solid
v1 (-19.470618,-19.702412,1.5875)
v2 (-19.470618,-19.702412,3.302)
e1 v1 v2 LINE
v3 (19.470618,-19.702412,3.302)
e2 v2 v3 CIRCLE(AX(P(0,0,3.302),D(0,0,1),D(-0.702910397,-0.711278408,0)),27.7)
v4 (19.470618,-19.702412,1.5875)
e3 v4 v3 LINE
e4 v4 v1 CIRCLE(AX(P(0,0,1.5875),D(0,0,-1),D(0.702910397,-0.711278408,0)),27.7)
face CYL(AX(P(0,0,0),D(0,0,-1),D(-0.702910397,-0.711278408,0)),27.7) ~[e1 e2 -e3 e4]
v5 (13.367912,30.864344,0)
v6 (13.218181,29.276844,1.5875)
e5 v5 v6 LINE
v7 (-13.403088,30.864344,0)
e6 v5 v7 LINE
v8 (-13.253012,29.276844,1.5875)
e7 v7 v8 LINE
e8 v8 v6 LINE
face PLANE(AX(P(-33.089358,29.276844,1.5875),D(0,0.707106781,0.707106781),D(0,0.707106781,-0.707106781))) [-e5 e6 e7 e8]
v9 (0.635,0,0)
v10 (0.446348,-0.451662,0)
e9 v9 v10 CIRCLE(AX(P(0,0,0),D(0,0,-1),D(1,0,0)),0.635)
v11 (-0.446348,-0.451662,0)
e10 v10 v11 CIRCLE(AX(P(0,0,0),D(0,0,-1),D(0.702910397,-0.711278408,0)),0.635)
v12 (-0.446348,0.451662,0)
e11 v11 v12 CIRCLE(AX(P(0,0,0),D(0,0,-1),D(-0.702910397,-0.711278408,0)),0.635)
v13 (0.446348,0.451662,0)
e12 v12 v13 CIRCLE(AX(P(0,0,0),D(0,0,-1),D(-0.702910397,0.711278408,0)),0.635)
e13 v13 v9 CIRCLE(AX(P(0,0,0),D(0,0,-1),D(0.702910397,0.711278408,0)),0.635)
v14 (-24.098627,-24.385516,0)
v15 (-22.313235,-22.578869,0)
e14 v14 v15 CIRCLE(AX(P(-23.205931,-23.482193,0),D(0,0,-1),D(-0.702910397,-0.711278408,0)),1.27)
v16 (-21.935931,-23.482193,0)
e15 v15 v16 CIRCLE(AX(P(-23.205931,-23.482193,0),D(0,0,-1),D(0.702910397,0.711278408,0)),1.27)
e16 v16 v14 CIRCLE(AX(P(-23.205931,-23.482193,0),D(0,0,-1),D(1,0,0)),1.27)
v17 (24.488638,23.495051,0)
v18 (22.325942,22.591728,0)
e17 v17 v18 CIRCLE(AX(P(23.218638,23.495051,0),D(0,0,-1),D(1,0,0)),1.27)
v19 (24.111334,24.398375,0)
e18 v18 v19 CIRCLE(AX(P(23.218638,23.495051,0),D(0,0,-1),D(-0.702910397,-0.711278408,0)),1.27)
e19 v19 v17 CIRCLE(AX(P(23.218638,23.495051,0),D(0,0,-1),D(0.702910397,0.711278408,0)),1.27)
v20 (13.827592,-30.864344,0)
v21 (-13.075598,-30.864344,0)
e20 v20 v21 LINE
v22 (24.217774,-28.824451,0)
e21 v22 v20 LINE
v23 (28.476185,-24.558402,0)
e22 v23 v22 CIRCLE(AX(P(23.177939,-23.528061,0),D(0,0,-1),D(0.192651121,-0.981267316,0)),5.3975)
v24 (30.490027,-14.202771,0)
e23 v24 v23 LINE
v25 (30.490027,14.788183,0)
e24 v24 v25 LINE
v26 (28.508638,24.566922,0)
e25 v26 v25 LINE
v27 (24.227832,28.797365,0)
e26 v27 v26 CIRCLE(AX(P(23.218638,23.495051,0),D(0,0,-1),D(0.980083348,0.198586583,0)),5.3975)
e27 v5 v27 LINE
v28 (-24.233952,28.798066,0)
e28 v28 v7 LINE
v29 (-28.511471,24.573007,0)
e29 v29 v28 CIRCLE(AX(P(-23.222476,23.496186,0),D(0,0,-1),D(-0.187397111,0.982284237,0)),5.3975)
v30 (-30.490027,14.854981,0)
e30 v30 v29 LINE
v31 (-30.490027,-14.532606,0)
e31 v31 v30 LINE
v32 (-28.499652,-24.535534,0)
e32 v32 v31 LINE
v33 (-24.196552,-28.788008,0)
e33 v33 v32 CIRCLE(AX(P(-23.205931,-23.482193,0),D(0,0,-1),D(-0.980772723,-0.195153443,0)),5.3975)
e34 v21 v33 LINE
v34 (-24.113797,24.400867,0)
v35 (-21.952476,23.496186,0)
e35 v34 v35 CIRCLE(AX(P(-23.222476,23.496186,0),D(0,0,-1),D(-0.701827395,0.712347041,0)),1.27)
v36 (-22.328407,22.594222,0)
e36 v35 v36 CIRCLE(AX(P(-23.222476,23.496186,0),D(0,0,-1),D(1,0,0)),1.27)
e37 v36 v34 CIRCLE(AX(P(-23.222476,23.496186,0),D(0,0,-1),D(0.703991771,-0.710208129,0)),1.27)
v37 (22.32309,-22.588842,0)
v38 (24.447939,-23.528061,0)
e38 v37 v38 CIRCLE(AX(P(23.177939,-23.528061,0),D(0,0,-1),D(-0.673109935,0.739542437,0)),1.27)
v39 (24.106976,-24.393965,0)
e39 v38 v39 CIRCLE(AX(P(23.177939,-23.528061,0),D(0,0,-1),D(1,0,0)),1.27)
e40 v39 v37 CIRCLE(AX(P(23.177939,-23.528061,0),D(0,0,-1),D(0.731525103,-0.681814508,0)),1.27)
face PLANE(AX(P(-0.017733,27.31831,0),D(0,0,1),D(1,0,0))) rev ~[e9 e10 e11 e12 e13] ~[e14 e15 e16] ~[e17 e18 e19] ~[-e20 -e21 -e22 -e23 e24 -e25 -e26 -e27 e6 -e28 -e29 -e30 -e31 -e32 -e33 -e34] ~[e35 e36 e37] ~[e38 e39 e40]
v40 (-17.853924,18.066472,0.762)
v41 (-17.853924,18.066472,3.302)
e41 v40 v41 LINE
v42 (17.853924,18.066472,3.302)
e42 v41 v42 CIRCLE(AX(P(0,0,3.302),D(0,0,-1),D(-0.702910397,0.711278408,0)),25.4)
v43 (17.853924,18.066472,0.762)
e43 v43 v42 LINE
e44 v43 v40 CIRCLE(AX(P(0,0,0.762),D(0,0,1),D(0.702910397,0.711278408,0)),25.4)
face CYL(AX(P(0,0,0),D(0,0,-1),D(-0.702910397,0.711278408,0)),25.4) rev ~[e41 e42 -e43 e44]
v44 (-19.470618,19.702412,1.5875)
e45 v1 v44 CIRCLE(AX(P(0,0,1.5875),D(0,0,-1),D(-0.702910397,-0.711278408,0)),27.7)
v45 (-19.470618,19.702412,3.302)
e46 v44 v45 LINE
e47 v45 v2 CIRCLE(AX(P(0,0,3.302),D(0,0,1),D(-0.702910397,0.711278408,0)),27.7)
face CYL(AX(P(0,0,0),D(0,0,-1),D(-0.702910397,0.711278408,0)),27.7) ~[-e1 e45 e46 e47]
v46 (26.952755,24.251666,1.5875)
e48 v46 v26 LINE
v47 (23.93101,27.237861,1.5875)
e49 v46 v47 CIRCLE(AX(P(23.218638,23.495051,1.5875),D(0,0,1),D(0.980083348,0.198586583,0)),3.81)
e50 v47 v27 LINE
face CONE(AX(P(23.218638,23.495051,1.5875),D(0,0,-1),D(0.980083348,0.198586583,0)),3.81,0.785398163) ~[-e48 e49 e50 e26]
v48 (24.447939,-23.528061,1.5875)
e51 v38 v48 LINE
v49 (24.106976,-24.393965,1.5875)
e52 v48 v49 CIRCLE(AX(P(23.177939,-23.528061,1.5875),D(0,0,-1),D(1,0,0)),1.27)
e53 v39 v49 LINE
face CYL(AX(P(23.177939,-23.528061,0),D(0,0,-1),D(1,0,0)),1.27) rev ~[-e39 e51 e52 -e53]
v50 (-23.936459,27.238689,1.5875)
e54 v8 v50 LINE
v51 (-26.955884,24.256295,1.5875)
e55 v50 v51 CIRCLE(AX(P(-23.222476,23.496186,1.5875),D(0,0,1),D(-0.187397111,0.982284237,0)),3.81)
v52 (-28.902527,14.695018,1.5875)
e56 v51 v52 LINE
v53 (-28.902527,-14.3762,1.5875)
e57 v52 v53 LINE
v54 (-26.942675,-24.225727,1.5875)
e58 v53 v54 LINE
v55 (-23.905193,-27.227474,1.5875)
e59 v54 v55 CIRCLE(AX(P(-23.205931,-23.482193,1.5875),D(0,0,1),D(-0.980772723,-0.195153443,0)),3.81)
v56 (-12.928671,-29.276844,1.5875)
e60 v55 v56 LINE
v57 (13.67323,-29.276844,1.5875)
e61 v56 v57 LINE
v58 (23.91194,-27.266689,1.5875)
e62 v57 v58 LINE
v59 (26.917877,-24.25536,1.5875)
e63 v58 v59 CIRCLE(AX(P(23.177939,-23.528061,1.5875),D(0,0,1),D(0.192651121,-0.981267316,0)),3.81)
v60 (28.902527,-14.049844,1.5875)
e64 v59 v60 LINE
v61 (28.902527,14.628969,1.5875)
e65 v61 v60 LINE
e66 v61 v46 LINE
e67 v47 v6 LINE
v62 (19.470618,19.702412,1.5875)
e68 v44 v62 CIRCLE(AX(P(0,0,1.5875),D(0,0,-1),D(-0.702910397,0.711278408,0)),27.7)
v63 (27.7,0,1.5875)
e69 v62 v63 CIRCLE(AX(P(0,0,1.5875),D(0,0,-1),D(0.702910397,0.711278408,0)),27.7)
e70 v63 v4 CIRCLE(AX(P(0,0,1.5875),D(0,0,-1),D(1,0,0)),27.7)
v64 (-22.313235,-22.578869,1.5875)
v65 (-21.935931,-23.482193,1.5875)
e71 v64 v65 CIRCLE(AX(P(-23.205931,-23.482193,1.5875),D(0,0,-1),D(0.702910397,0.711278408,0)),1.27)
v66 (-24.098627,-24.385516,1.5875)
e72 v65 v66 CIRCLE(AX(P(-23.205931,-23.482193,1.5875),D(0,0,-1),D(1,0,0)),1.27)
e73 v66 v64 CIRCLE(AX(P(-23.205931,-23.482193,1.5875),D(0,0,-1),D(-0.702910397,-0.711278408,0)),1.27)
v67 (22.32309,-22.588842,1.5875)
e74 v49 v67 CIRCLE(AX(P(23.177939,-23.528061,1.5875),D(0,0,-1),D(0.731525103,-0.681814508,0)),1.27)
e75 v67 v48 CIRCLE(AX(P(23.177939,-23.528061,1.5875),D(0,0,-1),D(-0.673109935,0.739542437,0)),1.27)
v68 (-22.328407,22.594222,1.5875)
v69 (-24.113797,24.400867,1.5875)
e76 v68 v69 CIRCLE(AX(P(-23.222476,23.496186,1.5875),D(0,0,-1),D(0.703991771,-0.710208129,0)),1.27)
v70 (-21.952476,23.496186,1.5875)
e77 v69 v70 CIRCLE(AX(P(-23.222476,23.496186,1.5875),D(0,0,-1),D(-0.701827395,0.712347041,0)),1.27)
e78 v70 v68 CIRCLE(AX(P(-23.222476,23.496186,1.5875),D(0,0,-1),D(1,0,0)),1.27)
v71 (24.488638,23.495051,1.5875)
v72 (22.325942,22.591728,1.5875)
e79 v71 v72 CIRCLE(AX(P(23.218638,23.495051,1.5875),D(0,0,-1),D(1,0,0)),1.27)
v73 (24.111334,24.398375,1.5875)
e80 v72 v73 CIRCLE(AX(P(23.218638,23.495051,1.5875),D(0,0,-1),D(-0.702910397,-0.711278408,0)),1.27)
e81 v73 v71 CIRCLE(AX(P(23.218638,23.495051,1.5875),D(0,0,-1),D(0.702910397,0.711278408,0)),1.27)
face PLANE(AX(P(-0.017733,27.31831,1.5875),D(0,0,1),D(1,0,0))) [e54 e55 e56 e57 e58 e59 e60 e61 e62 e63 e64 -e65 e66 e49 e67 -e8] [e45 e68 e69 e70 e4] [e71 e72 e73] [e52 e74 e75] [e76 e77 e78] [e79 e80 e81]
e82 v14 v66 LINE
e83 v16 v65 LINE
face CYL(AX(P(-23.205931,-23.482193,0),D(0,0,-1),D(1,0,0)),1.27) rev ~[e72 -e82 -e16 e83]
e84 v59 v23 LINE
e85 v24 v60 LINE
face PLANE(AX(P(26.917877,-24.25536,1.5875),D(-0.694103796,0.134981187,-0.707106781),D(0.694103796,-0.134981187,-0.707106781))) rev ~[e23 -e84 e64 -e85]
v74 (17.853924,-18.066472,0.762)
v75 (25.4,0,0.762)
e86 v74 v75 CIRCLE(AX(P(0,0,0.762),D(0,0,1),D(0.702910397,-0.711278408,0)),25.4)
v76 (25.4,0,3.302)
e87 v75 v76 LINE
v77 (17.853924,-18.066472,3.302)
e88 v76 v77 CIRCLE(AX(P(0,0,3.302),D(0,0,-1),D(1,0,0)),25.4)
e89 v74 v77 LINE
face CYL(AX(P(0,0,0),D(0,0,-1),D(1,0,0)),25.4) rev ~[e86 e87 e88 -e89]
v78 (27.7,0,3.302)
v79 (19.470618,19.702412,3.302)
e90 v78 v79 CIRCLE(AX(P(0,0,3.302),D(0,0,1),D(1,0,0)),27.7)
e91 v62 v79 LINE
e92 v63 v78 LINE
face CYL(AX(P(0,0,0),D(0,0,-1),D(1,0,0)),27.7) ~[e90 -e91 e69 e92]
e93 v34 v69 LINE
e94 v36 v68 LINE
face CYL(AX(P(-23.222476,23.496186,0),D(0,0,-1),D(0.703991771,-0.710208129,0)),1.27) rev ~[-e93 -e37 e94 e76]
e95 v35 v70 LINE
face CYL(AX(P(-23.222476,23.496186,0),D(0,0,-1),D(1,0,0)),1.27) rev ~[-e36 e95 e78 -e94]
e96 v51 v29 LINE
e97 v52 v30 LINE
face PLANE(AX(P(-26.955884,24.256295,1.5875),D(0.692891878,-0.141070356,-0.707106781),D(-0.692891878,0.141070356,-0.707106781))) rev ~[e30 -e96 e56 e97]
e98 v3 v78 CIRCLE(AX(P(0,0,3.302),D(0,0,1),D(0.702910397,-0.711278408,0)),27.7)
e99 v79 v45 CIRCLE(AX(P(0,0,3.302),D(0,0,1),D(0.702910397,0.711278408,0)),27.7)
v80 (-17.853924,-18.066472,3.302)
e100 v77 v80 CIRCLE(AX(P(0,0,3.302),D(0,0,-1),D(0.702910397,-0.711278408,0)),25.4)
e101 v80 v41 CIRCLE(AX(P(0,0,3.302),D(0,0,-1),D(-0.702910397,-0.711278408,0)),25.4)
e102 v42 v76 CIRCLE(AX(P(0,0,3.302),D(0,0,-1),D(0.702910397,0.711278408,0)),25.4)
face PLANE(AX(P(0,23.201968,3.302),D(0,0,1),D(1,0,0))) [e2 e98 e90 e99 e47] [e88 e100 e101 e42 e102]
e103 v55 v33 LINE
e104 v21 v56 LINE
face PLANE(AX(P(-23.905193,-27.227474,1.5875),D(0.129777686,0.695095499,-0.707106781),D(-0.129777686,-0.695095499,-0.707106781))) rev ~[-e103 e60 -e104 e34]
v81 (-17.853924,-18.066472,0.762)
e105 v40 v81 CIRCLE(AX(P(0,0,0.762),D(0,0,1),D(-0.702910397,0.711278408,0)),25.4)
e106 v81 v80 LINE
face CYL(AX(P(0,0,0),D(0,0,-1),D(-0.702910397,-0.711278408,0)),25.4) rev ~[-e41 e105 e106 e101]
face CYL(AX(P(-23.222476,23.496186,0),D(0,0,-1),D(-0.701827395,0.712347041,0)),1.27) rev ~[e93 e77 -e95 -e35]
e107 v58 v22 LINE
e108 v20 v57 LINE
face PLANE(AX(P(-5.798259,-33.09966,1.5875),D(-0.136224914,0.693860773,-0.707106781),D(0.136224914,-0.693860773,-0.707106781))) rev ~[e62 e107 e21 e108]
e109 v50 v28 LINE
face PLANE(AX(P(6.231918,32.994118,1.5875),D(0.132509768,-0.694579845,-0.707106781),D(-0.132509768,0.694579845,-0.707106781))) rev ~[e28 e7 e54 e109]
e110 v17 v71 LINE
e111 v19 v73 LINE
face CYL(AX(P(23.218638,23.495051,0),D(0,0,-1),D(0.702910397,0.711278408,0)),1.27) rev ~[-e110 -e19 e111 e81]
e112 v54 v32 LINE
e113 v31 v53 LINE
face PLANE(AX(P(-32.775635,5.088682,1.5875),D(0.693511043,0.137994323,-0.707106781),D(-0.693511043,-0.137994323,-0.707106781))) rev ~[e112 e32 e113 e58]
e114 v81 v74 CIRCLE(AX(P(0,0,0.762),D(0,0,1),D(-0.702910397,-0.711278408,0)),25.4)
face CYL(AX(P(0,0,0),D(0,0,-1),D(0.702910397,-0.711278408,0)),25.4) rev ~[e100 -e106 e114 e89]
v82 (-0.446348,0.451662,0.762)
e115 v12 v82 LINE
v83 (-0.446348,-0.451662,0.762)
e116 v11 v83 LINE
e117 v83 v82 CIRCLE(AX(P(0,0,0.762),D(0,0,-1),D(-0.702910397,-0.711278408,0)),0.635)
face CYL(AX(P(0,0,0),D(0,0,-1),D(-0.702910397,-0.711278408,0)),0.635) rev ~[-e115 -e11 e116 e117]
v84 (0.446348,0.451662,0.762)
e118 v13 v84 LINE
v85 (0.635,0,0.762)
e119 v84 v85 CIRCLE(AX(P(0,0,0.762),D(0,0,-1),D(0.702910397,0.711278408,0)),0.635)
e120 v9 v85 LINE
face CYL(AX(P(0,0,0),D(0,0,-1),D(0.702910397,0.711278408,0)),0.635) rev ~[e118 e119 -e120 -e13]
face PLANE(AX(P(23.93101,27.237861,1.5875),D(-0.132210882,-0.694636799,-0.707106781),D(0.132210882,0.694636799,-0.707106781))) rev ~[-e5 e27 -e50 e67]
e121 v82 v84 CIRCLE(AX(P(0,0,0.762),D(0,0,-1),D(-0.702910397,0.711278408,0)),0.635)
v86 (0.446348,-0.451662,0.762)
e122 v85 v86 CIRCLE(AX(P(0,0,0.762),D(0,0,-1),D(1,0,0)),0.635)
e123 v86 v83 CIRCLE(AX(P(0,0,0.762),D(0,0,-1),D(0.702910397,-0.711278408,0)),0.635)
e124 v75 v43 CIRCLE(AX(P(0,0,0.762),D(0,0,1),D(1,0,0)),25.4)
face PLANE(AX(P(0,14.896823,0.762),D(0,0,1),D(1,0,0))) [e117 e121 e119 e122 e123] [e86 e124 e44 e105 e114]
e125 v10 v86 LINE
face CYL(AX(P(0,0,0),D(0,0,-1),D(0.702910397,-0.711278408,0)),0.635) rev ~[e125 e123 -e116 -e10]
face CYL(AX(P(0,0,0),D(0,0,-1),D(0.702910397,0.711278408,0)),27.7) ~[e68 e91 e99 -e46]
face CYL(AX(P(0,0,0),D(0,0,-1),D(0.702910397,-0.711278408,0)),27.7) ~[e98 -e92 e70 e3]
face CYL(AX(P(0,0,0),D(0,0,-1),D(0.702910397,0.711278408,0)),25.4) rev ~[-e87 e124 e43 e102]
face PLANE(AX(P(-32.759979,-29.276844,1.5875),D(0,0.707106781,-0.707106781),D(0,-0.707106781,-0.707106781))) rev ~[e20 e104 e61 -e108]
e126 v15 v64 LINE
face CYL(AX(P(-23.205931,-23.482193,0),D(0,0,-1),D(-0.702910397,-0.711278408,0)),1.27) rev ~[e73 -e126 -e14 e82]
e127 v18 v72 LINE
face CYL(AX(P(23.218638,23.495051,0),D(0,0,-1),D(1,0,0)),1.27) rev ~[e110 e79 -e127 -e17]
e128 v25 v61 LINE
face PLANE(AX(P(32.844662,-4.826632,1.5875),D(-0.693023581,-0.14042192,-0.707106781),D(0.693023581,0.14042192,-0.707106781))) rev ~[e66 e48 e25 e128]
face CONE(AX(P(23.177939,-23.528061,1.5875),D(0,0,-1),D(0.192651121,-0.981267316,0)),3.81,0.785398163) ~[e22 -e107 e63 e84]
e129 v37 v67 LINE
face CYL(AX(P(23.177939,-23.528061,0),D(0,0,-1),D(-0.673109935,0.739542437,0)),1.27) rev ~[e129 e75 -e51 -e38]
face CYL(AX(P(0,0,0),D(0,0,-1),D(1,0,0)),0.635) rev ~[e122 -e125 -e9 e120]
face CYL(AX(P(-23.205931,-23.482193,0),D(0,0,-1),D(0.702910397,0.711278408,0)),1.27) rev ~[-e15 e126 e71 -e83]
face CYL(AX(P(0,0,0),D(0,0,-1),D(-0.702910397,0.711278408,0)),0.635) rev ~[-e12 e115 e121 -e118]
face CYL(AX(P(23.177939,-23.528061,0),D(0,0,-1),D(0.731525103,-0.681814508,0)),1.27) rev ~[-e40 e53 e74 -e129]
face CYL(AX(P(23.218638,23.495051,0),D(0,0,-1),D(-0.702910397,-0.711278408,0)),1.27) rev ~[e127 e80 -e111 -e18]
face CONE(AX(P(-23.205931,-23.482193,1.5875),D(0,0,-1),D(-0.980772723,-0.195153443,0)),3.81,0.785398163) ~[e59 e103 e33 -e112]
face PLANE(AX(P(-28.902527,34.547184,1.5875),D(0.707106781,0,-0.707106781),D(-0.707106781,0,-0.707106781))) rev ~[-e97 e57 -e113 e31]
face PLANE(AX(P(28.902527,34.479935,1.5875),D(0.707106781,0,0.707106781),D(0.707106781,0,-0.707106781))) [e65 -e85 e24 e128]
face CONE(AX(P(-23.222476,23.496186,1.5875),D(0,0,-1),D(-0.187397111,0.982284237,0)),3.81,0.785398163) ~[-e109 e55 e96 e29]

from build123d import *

# Parameters (mm, degrees)
F1_DEPTH     = 0.762
F2_DEPTH     = 3.302
F3_DEPTH     = 1.5875
F4_T1_DEPTH  = 68.7698589568
F4_T3_DEPTH  = 29.8890950425
F4_T5_DEPTH  = 30.9975051116
F4_T7_DEPTH  = 66.2764134385
F4_T9_DEPTH  = 29.6095967996
F4_T11_DEPTH = 30.7124717043
F4_T13_DEPTH = 66.1433332478
F4_T15_DEPTH = 30.7409380137
F4_T17_DEPTH = 29.6692094887
F4_T19_DEPTH = 68.3706865963
F4_T21_DEPTH = 30.237608237
F4_T23_DEPTH = 30.2773753002
F4_T26_ANGLE = 67.887600788
F4_T28_ANGLE = 67.7694142572
F4_T30_ANGLE = 67.6911456036
F4_T32_ANGLE = 68.1706761996


# Not quite as in the source:
# - a fillet or chamfer that OpenCascade refuses, or shapes differently, is made with other operations: its cross-section is extruded or revolved along the edge and cut away or added


with BuildPart() as f1:
    # F0 (on Top) → F1 (new body)
    with BuildSketch(Plane.XY):
        with BuildLine():
            Line((0.4463481019, 0.4516617893), (17.8539240764, 18.0664715723))
            ThreePointArc((17.8539240764, 18.0664715723), (0, 25.4), (-17.8539240764, 18.0664715723))
            Line((-17.8539240764, 18.0664715723), (-0.4463481019, 0.4516617893))
            ThreePointArc((-0.4463481019, 0.4516617893), (0, 0.635), (0.4463481019, 0.4516617893))
        make_face()
        with BuildLine():
            Line((-0.4463481019, 0.4516617893), (-17.8539240764, 18.0664715723))
            ThreePointArc((-17.8539240764, 18.0664715723), (-25.4, 0), (-17.8539240764, -18.0664715723))
            Line((-17.8539240764, -18.0664715723), (-0.4463481019, -0.4516617893))
            ThreePointArc((-0.4463481019, -0.4516617893), (-0.635, 0), (-0.4463481019, 0.4516617893))
        make_face()
        with BuildLine():
            ThreePointArc((-17.8539240764, -18.0664715723), (0, -25.4), (17.8539240764, -18.0664715723))
            Line((17.8539240764, -18.0664715723), (0.4463481019, -0.4516617893))
            ThreePointArc((0.4463481019, -0.4516617893), (0, -0.635), (-0.4463481019, -0.4516617893))
            Line((-0.4463481019, -0.4516617893), (-17.8539240764, -18.0664715723))
        make_face()
        with BuildLine():
            ThreePointArc((17.8539240764, -18.0664715723), (23.4376798291, -9.789543617), (25.4, 0))
            ThreePointArc((25.4, 0), (23.4376798291, 9.789543617), (17.8539240764, 18.0664715723))
            Line((17.8539240764, 18.0664715723), (0.4463481019, 0.4516617893))
            ThreePointArc((0.4463481019, 0.4516617893), (0.5859419957, 0.2447385904), (0.635, 0))
            ThreePointArc((0.635, 0), (0.5859419957, -0.2447385904), (0.4463481019, -0.4516617893))
            Line((0.4463481019, -0.4516617893), (17.8539240764, -18.0664715723))
        make_face()
    extrude(amount=F1_DEPTH)

    # F0 (on Top) → F2 (join)
    with BuildSketch(Plane.XY):
        with BuildLine():
            ThreePointArc((-17.8539240764, 18.0664715723), (0, 25.4), (17.8539240764, 18.0664715723))
            Line((17.8539240764, 18.0664715723), (19.4706182402, 19.7024121658))
            ThreePointArc((19.4706182402, 19.7024121658), (0, 27.7000003576), (-19.4706182402, 19.7024121658))
            Line((-19.4706182402, 19.7024121658), (-17.8539240764, 18.0664715723))
        make_face()
        with BuildLine():
            ThreePointArc((-17.8539240764, -18.0664715723), (-25.4, 0), (-17.8539240764, 18.0664715723))
            Line((-17.8539240764, 18.0664715723), (-19.4706182402, 19.7024121658))
            ThreePointArc((-19.4706182402, 19.7024121658), (-27.7000003576, 0), (-19.4706182402, -19.7024121658))
            Line((-19.4706182402, -19.7024121658), (-17.8539240764, -18.0664715723))
        make_face()
        with BuildLine():
            Line((19.4706182402, -19.7024121658), (17.8539240764, -18.0664715723))
            ThreePointArc((17.8539240764, -18.0664715723), (0, -25.4), (-17.8539240764, -18.0664715723))
            Line((-17.8539240764, -18.0664715723), (-19.4706182402, -19.7024121658))
            ThreePointArc((-19.4706182402, -19.7024121658), (0, -27.7000003576), (19.4706182402, -19.7024121658))
        make_face()
        with BuildLine():
            ThreePointArc((17.8539240764, 18.0664715723), (23.4376798291, 9.789543617), (25.4, 0))
            ThreePointArc((25.4, 0), (23.4376798291, -9.789543617), (17.8539240764, -18.0664715723))
            Line((17.8539240764, -18.0664715723), (19.4706182402, -19.7024121658))
            ThreePointArc((19.4706182402, -19.7024121658), (25.5599897498, -10.6759984918), (27.7000003576, 0))
            ThreePointArc((27.7000003576, 0), (25.5599897498, 10.6759984918), (19.4706182402, 19.7024121658))
            Line((19.4706182402, 19.7024121658), (17.8539240764, 18.0664715723))
        make_face()
    extrude(amount=F2_DEPTH)

    # F0 (on Top) → F3 (join)
    with BuildSketch(Plane.XY):
        with BuildLine():
            ThreePointArc((-19.4706182402, 19.7024121658), (0, 27.7000003576), (19.4706182402, 19.7024121658))
            Line((19.4706182402, 19.7024121658), (22.3259415659, 22.5917275607))
            ThreePointArc((22.3259415659, 22.5917275607), (22.3153141911, 24.3877473432), (24.1113339735, 24.398374718))
            Line((24.1113339735, 24.398374718), (26.7918864226, 27.1108386229))
            Line((26.7918864226, 27.1108386229), (27.6821187888, 28.0116690324))
            ThreePointArc((27.6821187888, 28.0116690324), (26.1722118102, 29.1163410613), (24.4059253481, 29.7330675073))
            Line((24.4059253481, 29.7330675073), (13.4577511535, 31.8168438971))
            Line((13.4577511535, 31.8168438971), (-13.4931333577, 31.8168438971))
            Line((-13.4931333577, 31.8168438971), (-24.4124478948, 29.7336912681))
            ThreePointArc((-24.4124478948, 29.7336912681), (-26.1764044214, 29.1172901956), (-27.6845826781, 28.0141622538))
            Line((-27.6845826781, 28.0141622538), (-26.7918864226, 27.1108386229))
            Line((-26.7918864226, 27.1108386229), (-24.1137970362, 24.4008671029))
            ThreePointArc((-24.1137970362, 24.4008671029), (-22.7321077122, 24.6676976509), (-21.952476244, 23.4961863607))
            ThreePointArc((-21.952476244, 23.4961863607), (-22.0502202295, 23.007600814), (-22.328406695, 22.5942220368))
            Line((-22.328406695, 22.5942220368), (-19.4706182402, 19.7024121658))
        make_face()
        with BuildLine():
            ThreePointArc((-19.4706182402, -19.7024121658), (-27.7000003576, 0), (-19.4706182402, 19.7024121658))
            Line((-19.4706182402, 19.7024121658), (-22.328406695, 22.5942220368))
            ThreePointArc((-22.328406695, 22.5942220368), (-24.1257998226, 22.6034901569), (-24.1137970362, 24.4008671029))
            Line((-24.1137970362, 24.4008671029), (-26.7918864226, 27.1108386229))
            Line((-26.7918864226, 27.1108386229), (-27.6845826781, 28.0141622538))
            ThreePointArc((-27.6845826781, 28.0141622538), (-28.806546627, 26.5195384668), (-29.4448227731, 24.7630342884))
            Line((-29.4448227731, 24.7630342884), (-31.4425267279, 14.9509597699))
            Line((-31.4425267279, 14.9509597699), (-31.4425267279, -14.6264504503))
            Line((-31.4425267279, -14.6264504503), (-29.4338375739, -24.7214172456))
            ThreePointArc((-29.4338375739, -24.7214172456), (-28.7971534061, -26.4922974633), (-27.669411804, -27.9988107734))
            Line((-27.669411804, -27.9988107734), (-26.7918864226, -27.1108386229))
            Line((-26.7918864226, -27.1108386229), (-24.0986269887, -24.385516459))
            ThreePointArc((-24.0986269887, -24.385516459), (-24.1092543635, -22.5894966765), (-22.3132345811, -22.5788693018))
            Line((-22.3132345811, -22.5788693018), (-19.4706182402, -19.7024121658))
        make_face()
        with BuildLine():
            Line((22.3230898006, -22.5888418457), (19.4706182402, -19.7024121658))
            ThreePointArc((19.4706182402, -19.7024121658), (0, -27.7000003576), (-19.4706182402, -19.7024121658))
            Line((-19.4706182402, -19.7024121658), (-22.3132345811, -22.5788693018))
            ThreePointArc((-22.3132345811, -22.5788693018), (-22.0340467935, -22.9927156995), (-21.9359307849, -23.4821928804))
            ThreePointArc((-21.9359307849, -23.4821928804), (-22.7164536041, -24.6540768718), (-24.0986269887, -24.385516459))
            Line((-24.0986269887, -24.385516459), (-26.7918864226, -27.1108386229))
            Line((-26.7918864226, -27.1108386229), (-27.669411804, -27.9988107734))
            ThreePointArc((-27.669411804, -27.9988107734), (-26.1496583495, -29.1086454062), (-24.3713676477, -29.724328486))
            Line((-24.3713676477, -29.724328486), (-13.163754974, -31.8168438971))
            Line((-13.163754974, -31.8168438971), (13.9202097279, -31.8168438971))
            Line((13.9202097279, -31.8168438971), (24.4012740355, -29.7591081974))
            ThreePointArc((24.4012740355, -29.7591081974), (26.1707747188, -29.1285461533), (27.6783635387, -28.0078690768))
            Line((27.6783635387, -28.0078690768), (26.7918864226, -27.1108386229))
            Line((26.7918864226, -27.1108386229), (24.1069762986, -24.3939651657))
            ThreePointArc((24.1069762986, -24.3939651657), (22.2746158391, -24.4207569441), (22.3230898006, -22.5888418457))
        make_face()
        with BuildLine():
            Line((22.3259415659, 22.5917275607), (19.4706182402, 19.7024121658))
            ThreePointArc((19.4706182402, 19.7024121658), (25.5599897498, 10.6759984918), (27.7000003576, 0))
            ThreePointArc((27.7000003576, 0), (25.5599897498, -10.6759984918), (19.4706182402, -19.7024121658))
            Line((19.4706182402, -19.7024121658), (22.3230898006, -22.5888418457))
            ThreePointArc((22.3230898006, -22.5888418457), (23.6913792809, -22.3664758287), (24.4479394177, -23.5280607403))
            ThreePointArc((24.4479394177, -23.5280607403), (24.3596282174, -23.9933687895), (24.1069762986, -24.3939651657))
            Line((24.1069762986, -24.3939651657), (26.7918864226, -27.1108386229))
            Line((26.7918864226, -27.1108386229), (27.6783635387, -28.0078690768))
            ThreePointArc((27.6783635387, -28.0078690768), (28.7879487003, -26.5030054203), (29.411169277, -24.7402263734))
            Line((29.411169277, -24.7402263734), (31.4425267279, -14.2945268971))
            Line((31.4425267279, -14.2945268971), (31.4425267279, 14.8837109626))
            Line((31.4425267279, 14.8837109626), (29.4421670292, 24.7560759433))
            ThreePointArc((29.4421670292, 24.7560759433), (28.8045816259, 26.5149404148), (27.6821187888, 28.0116690324))
            Line((27.6821187888, 28.0116690324), (26.7918864226, 27.1108386229))
            Line((26.7918864226, 27.1108386229), (24.1113339735, 24.398374718))
            ThreePointArc((24.1113339735, 24.398374718), (24.3905217612, 23.9845283202), (24.4886377697, 23.4950511393))
            ThreePointArc((24.4886377697, 23.4950511393), (23.7081149506, 22.3231671479), (22.3259415659, 22.5917275607))
        make_face()
    extrude(amount=F3_DEPTH)

    # F4: chamfer of 2.54 on 12 edges, made by hand

    # F4_s2 → F4_t1 (cut)
    with BuildSketch(Plane.XZ.offset(-34.5471841382)):
        Polygon((-28.9025267279, 1.5875), (-31.4425267279, -0.9525), (-31.4425267279, 1.5875), align=None)
    extrude(amount=F4_T1_DEPTH, mode=Mode.SUBTRACT)

    # F4_s4 → F4_t3 (cut)
    with BuildSketch(Plane(origin=(-2.2222353061, 11.168174818, 0), x_dir=(0, 0, 1), z_dir=(0.1951534433, -0.9807727227, 0))):
        Polygon((1.5875, 31.1523747161), (-0.9525, 33.6923747161), (1.5875, 33.6923747161), align=None)
    extrude(amount=F4_T3_DEPTH, mode=Mode.SUBTRACT)

    # F4_s6 → F4_t5 (cut)
    with BuildSketch(Plane(origin=(-18.1876927678, 3.3957300736, 0), x_dir=(0, 0, 1), z_dir=(0.9830134812, -0.1835333642, 0))):
        Polygon((1.5875, 31.1523747161), (-0.9525, 33.6923747161), (1.5875, 33.6923747161), align=None)
    extrude(amount=F4_T5_DEPTH, mode=Mode.SUBTRACT)

    # F4_s8 → F4_t7 (cut)
    with BuildSketch(Plane.YZ.offset(-32.7599793423)):
        Polygon((-29.2768438971, 1.5875), (-31.8168438971, -0.9525), (-31.8168438971, 1.5875), align=None)
    extrude(amount=F4_T7_DEPTH, mode=Mode.SUBTRACT)

    # F4_s10 → F4_t9 (cut)
    with BuildSketch(Plane(origin=(3.6690463267, 18.0211666908, 0), x_dir=(0, 0, 1), z_dir=(-0.1995036107, -0.9798970912, 0))):
        Polygon((1.5875, 31.2532109374), (-0.9525, 33.7932109374), (1.5875, 33.7932109374), align=None)
    extrude(amount=F4_T9_DEPTH, mode=Mode.SUBTRACT)

    # F4_s12 → F4_t11 (cut)
    with BuildSketch(Plane(origin=(12.0865328675, 2.3058308864, 0), x_dir=(0, 0, 1), z_dir=(-0.9822842374, -0.1873971104, 0))):
        Polygon((1.5875, 31.2417584447), (-0.9525, 33.7817584447), (1.5875, 33.7817584447), align=None)
    extrude(amount=F4_T11_DEPTH, mode=Mode.SUBTRACT)

    # F4_s14 → F4_t13 (cut)
    with BuildSketch(Plane.YZ.offset(-33.089357726)):
        Polygon((29.2768438971, 1.5875), (31.8168438971, -0.9525), (31.8168438971, 1.5875), align=None)
    extrude(amount=F4_T13_DEPTH, mode=Mode.SUBTRACT)

    # F4_s16 → F4_t15 (cut)
    with BuildSketch(Plane(origin=(18.0914247696, -3.4433580544, 0), x_dir=(0, 0, 1), z_dir=(-0.9823647823, 0.1869744218, 0))):
        Polygon((1.5875, 31.2320021705), (-0.9525, 33.7720021705), (1.5875, 33.7720021705), align=None)
    extrude(amount=F4_T15_DEPTH, mode=Mode.SUBTRACT)

    # F4_s18 → F4_t17 (cut)
    with BuildSketch(Plane(origin=(2.2346970165, -11.0288887457, 0), x_dir=(0, 0, 1), z_dir=(-0.1985865833, 0.980083348, 0))):
        Polygon((1.5875, 31.2320021705), (-0.9525, 33.7720021705), (1.5875, 33.7720021705), align=None)
    extrude(amount=F4_T17_DEPTH, mode=Mode.SUBTRACT)

    # F4_s20 → F4_t19 (cut)
    with BuildSketch(Plane.XZ.offset(-34.4799353309)):
        Polygon((28.9025267279, 1.5875), (31.4425267279, -0.9525), (31.4425267279, 1.5875), align=None)
    extrude(amount=F4_T19_DEPTH, mode=Mode.SUBTRACT)

    # F4_s22 → F4_t21 (cut)
    with BuildSketch(Plane(origin=(-3.5641324861, -18.3275753981, 0), x_dir=(0, 0, 1), z_dir=(0.1908922257, 0.9816110015, 0))):
        Polygon((1.5875, 31.053044204), (-0.9525, 33.593044204), (1.5875, 33.593044204), align=None)
    extrude(amount=F4_T21_DEPTH, mode=Mode.SUBTRACT)

    # F4_s24 → F4_t23 (cut)
    with BuildSketch(Plane(origin=(-11.8402934583, -2.3245916472, 0), x_dir=(0, 0, 1), z_dir=(0.9812673161, 0.1926511209, 0))):
        Polygon((1.5875, 31.3625730245), (-0.9525, 33.9025730245), (1.5875, 33.9025730245), align=None)
    extrude(amount=F4_T23_DEPTH, mode=Mode.SUBTRACT)

    # F4_s25 → F4_t26 (revolve, cut)
    with BuildSketch(Plane(origin=(17.8699053405, 3.5083786426, 0), x_dir=(0, 0, 1), z_dir=(-0.9812673161, -0.1926511209, 0))):
        Polygon((1.5875, -31.3625730245), (-0.9525, -33.9025730245), (1.5875, -33.9025730245), align=None)
    revolve(axis=Axis((23.1779394177, -23.5280607403, 1.5875), (0, 0, 1)), revolution_arc=F4_T26_ANGLE, mode=Mode.SUBTRACT)

    # F4_s27 → F4_t28 (revolve, cut)
    with BuildSketch(Plane(origin=(-3.6572099251, 18.0494094211, 0), x_dir=(0, 0, 1), z_dir=(0.1985865833, -0.980083348, 0))):
        Polygon((1.5875, -31.2320021705), (-0.9525, -33.7720021705), (1.5875, -33.7720021705), align=None)
    revolve(axis=Axis((23.2186377697, 23.4950511393, 1.5875), (0, 0, 1)), revolution_arc=F4_T28_ANGLE, mode=Mode.SUBTRACT)

    # F4_s29 → F4_t30 (revolve, cut)
    with BuildSketch(Plane(origin=(-18.081843979, -3.4495975634, 0), x_dir=(0, 0, 1), z_dir=(0.9822842374, 0.1873971104, 0))):
        Polygon((1.5875, -31.2417584447), (-0.9525, -33.7817584447), (1.5875, -33.7817584447), align=None)
    revolve(axis=Axis((-23.222476244, 23.4961863607, 1.5875), (0, 0, 1)), revolution_arc=F4_T30_ANGLE, mode=Mode.SUBTRACT)

    # F4_s31 → F4_t32 (revolve, cut)
    with BuildSketch(Plane(origin=(3.6107245099, -18.1462343053, 0), x_dir=(0, 0, 1), z_dir=(-0.1951534433, 0.9807727227, 0))):
        Polygon((1.5875, -31.1523747161), (-0.9525, -33.6923747161), (1.5875, -33.6923747161), align=None)
    revolve(axis=Axis((-23.2059307849, -23.4821928804, 1.5875), (0, 0, 1)), revolution_arc=F4_T32_ANGLE, mode=Mode.SUBTRACT)


solid = f1.part
